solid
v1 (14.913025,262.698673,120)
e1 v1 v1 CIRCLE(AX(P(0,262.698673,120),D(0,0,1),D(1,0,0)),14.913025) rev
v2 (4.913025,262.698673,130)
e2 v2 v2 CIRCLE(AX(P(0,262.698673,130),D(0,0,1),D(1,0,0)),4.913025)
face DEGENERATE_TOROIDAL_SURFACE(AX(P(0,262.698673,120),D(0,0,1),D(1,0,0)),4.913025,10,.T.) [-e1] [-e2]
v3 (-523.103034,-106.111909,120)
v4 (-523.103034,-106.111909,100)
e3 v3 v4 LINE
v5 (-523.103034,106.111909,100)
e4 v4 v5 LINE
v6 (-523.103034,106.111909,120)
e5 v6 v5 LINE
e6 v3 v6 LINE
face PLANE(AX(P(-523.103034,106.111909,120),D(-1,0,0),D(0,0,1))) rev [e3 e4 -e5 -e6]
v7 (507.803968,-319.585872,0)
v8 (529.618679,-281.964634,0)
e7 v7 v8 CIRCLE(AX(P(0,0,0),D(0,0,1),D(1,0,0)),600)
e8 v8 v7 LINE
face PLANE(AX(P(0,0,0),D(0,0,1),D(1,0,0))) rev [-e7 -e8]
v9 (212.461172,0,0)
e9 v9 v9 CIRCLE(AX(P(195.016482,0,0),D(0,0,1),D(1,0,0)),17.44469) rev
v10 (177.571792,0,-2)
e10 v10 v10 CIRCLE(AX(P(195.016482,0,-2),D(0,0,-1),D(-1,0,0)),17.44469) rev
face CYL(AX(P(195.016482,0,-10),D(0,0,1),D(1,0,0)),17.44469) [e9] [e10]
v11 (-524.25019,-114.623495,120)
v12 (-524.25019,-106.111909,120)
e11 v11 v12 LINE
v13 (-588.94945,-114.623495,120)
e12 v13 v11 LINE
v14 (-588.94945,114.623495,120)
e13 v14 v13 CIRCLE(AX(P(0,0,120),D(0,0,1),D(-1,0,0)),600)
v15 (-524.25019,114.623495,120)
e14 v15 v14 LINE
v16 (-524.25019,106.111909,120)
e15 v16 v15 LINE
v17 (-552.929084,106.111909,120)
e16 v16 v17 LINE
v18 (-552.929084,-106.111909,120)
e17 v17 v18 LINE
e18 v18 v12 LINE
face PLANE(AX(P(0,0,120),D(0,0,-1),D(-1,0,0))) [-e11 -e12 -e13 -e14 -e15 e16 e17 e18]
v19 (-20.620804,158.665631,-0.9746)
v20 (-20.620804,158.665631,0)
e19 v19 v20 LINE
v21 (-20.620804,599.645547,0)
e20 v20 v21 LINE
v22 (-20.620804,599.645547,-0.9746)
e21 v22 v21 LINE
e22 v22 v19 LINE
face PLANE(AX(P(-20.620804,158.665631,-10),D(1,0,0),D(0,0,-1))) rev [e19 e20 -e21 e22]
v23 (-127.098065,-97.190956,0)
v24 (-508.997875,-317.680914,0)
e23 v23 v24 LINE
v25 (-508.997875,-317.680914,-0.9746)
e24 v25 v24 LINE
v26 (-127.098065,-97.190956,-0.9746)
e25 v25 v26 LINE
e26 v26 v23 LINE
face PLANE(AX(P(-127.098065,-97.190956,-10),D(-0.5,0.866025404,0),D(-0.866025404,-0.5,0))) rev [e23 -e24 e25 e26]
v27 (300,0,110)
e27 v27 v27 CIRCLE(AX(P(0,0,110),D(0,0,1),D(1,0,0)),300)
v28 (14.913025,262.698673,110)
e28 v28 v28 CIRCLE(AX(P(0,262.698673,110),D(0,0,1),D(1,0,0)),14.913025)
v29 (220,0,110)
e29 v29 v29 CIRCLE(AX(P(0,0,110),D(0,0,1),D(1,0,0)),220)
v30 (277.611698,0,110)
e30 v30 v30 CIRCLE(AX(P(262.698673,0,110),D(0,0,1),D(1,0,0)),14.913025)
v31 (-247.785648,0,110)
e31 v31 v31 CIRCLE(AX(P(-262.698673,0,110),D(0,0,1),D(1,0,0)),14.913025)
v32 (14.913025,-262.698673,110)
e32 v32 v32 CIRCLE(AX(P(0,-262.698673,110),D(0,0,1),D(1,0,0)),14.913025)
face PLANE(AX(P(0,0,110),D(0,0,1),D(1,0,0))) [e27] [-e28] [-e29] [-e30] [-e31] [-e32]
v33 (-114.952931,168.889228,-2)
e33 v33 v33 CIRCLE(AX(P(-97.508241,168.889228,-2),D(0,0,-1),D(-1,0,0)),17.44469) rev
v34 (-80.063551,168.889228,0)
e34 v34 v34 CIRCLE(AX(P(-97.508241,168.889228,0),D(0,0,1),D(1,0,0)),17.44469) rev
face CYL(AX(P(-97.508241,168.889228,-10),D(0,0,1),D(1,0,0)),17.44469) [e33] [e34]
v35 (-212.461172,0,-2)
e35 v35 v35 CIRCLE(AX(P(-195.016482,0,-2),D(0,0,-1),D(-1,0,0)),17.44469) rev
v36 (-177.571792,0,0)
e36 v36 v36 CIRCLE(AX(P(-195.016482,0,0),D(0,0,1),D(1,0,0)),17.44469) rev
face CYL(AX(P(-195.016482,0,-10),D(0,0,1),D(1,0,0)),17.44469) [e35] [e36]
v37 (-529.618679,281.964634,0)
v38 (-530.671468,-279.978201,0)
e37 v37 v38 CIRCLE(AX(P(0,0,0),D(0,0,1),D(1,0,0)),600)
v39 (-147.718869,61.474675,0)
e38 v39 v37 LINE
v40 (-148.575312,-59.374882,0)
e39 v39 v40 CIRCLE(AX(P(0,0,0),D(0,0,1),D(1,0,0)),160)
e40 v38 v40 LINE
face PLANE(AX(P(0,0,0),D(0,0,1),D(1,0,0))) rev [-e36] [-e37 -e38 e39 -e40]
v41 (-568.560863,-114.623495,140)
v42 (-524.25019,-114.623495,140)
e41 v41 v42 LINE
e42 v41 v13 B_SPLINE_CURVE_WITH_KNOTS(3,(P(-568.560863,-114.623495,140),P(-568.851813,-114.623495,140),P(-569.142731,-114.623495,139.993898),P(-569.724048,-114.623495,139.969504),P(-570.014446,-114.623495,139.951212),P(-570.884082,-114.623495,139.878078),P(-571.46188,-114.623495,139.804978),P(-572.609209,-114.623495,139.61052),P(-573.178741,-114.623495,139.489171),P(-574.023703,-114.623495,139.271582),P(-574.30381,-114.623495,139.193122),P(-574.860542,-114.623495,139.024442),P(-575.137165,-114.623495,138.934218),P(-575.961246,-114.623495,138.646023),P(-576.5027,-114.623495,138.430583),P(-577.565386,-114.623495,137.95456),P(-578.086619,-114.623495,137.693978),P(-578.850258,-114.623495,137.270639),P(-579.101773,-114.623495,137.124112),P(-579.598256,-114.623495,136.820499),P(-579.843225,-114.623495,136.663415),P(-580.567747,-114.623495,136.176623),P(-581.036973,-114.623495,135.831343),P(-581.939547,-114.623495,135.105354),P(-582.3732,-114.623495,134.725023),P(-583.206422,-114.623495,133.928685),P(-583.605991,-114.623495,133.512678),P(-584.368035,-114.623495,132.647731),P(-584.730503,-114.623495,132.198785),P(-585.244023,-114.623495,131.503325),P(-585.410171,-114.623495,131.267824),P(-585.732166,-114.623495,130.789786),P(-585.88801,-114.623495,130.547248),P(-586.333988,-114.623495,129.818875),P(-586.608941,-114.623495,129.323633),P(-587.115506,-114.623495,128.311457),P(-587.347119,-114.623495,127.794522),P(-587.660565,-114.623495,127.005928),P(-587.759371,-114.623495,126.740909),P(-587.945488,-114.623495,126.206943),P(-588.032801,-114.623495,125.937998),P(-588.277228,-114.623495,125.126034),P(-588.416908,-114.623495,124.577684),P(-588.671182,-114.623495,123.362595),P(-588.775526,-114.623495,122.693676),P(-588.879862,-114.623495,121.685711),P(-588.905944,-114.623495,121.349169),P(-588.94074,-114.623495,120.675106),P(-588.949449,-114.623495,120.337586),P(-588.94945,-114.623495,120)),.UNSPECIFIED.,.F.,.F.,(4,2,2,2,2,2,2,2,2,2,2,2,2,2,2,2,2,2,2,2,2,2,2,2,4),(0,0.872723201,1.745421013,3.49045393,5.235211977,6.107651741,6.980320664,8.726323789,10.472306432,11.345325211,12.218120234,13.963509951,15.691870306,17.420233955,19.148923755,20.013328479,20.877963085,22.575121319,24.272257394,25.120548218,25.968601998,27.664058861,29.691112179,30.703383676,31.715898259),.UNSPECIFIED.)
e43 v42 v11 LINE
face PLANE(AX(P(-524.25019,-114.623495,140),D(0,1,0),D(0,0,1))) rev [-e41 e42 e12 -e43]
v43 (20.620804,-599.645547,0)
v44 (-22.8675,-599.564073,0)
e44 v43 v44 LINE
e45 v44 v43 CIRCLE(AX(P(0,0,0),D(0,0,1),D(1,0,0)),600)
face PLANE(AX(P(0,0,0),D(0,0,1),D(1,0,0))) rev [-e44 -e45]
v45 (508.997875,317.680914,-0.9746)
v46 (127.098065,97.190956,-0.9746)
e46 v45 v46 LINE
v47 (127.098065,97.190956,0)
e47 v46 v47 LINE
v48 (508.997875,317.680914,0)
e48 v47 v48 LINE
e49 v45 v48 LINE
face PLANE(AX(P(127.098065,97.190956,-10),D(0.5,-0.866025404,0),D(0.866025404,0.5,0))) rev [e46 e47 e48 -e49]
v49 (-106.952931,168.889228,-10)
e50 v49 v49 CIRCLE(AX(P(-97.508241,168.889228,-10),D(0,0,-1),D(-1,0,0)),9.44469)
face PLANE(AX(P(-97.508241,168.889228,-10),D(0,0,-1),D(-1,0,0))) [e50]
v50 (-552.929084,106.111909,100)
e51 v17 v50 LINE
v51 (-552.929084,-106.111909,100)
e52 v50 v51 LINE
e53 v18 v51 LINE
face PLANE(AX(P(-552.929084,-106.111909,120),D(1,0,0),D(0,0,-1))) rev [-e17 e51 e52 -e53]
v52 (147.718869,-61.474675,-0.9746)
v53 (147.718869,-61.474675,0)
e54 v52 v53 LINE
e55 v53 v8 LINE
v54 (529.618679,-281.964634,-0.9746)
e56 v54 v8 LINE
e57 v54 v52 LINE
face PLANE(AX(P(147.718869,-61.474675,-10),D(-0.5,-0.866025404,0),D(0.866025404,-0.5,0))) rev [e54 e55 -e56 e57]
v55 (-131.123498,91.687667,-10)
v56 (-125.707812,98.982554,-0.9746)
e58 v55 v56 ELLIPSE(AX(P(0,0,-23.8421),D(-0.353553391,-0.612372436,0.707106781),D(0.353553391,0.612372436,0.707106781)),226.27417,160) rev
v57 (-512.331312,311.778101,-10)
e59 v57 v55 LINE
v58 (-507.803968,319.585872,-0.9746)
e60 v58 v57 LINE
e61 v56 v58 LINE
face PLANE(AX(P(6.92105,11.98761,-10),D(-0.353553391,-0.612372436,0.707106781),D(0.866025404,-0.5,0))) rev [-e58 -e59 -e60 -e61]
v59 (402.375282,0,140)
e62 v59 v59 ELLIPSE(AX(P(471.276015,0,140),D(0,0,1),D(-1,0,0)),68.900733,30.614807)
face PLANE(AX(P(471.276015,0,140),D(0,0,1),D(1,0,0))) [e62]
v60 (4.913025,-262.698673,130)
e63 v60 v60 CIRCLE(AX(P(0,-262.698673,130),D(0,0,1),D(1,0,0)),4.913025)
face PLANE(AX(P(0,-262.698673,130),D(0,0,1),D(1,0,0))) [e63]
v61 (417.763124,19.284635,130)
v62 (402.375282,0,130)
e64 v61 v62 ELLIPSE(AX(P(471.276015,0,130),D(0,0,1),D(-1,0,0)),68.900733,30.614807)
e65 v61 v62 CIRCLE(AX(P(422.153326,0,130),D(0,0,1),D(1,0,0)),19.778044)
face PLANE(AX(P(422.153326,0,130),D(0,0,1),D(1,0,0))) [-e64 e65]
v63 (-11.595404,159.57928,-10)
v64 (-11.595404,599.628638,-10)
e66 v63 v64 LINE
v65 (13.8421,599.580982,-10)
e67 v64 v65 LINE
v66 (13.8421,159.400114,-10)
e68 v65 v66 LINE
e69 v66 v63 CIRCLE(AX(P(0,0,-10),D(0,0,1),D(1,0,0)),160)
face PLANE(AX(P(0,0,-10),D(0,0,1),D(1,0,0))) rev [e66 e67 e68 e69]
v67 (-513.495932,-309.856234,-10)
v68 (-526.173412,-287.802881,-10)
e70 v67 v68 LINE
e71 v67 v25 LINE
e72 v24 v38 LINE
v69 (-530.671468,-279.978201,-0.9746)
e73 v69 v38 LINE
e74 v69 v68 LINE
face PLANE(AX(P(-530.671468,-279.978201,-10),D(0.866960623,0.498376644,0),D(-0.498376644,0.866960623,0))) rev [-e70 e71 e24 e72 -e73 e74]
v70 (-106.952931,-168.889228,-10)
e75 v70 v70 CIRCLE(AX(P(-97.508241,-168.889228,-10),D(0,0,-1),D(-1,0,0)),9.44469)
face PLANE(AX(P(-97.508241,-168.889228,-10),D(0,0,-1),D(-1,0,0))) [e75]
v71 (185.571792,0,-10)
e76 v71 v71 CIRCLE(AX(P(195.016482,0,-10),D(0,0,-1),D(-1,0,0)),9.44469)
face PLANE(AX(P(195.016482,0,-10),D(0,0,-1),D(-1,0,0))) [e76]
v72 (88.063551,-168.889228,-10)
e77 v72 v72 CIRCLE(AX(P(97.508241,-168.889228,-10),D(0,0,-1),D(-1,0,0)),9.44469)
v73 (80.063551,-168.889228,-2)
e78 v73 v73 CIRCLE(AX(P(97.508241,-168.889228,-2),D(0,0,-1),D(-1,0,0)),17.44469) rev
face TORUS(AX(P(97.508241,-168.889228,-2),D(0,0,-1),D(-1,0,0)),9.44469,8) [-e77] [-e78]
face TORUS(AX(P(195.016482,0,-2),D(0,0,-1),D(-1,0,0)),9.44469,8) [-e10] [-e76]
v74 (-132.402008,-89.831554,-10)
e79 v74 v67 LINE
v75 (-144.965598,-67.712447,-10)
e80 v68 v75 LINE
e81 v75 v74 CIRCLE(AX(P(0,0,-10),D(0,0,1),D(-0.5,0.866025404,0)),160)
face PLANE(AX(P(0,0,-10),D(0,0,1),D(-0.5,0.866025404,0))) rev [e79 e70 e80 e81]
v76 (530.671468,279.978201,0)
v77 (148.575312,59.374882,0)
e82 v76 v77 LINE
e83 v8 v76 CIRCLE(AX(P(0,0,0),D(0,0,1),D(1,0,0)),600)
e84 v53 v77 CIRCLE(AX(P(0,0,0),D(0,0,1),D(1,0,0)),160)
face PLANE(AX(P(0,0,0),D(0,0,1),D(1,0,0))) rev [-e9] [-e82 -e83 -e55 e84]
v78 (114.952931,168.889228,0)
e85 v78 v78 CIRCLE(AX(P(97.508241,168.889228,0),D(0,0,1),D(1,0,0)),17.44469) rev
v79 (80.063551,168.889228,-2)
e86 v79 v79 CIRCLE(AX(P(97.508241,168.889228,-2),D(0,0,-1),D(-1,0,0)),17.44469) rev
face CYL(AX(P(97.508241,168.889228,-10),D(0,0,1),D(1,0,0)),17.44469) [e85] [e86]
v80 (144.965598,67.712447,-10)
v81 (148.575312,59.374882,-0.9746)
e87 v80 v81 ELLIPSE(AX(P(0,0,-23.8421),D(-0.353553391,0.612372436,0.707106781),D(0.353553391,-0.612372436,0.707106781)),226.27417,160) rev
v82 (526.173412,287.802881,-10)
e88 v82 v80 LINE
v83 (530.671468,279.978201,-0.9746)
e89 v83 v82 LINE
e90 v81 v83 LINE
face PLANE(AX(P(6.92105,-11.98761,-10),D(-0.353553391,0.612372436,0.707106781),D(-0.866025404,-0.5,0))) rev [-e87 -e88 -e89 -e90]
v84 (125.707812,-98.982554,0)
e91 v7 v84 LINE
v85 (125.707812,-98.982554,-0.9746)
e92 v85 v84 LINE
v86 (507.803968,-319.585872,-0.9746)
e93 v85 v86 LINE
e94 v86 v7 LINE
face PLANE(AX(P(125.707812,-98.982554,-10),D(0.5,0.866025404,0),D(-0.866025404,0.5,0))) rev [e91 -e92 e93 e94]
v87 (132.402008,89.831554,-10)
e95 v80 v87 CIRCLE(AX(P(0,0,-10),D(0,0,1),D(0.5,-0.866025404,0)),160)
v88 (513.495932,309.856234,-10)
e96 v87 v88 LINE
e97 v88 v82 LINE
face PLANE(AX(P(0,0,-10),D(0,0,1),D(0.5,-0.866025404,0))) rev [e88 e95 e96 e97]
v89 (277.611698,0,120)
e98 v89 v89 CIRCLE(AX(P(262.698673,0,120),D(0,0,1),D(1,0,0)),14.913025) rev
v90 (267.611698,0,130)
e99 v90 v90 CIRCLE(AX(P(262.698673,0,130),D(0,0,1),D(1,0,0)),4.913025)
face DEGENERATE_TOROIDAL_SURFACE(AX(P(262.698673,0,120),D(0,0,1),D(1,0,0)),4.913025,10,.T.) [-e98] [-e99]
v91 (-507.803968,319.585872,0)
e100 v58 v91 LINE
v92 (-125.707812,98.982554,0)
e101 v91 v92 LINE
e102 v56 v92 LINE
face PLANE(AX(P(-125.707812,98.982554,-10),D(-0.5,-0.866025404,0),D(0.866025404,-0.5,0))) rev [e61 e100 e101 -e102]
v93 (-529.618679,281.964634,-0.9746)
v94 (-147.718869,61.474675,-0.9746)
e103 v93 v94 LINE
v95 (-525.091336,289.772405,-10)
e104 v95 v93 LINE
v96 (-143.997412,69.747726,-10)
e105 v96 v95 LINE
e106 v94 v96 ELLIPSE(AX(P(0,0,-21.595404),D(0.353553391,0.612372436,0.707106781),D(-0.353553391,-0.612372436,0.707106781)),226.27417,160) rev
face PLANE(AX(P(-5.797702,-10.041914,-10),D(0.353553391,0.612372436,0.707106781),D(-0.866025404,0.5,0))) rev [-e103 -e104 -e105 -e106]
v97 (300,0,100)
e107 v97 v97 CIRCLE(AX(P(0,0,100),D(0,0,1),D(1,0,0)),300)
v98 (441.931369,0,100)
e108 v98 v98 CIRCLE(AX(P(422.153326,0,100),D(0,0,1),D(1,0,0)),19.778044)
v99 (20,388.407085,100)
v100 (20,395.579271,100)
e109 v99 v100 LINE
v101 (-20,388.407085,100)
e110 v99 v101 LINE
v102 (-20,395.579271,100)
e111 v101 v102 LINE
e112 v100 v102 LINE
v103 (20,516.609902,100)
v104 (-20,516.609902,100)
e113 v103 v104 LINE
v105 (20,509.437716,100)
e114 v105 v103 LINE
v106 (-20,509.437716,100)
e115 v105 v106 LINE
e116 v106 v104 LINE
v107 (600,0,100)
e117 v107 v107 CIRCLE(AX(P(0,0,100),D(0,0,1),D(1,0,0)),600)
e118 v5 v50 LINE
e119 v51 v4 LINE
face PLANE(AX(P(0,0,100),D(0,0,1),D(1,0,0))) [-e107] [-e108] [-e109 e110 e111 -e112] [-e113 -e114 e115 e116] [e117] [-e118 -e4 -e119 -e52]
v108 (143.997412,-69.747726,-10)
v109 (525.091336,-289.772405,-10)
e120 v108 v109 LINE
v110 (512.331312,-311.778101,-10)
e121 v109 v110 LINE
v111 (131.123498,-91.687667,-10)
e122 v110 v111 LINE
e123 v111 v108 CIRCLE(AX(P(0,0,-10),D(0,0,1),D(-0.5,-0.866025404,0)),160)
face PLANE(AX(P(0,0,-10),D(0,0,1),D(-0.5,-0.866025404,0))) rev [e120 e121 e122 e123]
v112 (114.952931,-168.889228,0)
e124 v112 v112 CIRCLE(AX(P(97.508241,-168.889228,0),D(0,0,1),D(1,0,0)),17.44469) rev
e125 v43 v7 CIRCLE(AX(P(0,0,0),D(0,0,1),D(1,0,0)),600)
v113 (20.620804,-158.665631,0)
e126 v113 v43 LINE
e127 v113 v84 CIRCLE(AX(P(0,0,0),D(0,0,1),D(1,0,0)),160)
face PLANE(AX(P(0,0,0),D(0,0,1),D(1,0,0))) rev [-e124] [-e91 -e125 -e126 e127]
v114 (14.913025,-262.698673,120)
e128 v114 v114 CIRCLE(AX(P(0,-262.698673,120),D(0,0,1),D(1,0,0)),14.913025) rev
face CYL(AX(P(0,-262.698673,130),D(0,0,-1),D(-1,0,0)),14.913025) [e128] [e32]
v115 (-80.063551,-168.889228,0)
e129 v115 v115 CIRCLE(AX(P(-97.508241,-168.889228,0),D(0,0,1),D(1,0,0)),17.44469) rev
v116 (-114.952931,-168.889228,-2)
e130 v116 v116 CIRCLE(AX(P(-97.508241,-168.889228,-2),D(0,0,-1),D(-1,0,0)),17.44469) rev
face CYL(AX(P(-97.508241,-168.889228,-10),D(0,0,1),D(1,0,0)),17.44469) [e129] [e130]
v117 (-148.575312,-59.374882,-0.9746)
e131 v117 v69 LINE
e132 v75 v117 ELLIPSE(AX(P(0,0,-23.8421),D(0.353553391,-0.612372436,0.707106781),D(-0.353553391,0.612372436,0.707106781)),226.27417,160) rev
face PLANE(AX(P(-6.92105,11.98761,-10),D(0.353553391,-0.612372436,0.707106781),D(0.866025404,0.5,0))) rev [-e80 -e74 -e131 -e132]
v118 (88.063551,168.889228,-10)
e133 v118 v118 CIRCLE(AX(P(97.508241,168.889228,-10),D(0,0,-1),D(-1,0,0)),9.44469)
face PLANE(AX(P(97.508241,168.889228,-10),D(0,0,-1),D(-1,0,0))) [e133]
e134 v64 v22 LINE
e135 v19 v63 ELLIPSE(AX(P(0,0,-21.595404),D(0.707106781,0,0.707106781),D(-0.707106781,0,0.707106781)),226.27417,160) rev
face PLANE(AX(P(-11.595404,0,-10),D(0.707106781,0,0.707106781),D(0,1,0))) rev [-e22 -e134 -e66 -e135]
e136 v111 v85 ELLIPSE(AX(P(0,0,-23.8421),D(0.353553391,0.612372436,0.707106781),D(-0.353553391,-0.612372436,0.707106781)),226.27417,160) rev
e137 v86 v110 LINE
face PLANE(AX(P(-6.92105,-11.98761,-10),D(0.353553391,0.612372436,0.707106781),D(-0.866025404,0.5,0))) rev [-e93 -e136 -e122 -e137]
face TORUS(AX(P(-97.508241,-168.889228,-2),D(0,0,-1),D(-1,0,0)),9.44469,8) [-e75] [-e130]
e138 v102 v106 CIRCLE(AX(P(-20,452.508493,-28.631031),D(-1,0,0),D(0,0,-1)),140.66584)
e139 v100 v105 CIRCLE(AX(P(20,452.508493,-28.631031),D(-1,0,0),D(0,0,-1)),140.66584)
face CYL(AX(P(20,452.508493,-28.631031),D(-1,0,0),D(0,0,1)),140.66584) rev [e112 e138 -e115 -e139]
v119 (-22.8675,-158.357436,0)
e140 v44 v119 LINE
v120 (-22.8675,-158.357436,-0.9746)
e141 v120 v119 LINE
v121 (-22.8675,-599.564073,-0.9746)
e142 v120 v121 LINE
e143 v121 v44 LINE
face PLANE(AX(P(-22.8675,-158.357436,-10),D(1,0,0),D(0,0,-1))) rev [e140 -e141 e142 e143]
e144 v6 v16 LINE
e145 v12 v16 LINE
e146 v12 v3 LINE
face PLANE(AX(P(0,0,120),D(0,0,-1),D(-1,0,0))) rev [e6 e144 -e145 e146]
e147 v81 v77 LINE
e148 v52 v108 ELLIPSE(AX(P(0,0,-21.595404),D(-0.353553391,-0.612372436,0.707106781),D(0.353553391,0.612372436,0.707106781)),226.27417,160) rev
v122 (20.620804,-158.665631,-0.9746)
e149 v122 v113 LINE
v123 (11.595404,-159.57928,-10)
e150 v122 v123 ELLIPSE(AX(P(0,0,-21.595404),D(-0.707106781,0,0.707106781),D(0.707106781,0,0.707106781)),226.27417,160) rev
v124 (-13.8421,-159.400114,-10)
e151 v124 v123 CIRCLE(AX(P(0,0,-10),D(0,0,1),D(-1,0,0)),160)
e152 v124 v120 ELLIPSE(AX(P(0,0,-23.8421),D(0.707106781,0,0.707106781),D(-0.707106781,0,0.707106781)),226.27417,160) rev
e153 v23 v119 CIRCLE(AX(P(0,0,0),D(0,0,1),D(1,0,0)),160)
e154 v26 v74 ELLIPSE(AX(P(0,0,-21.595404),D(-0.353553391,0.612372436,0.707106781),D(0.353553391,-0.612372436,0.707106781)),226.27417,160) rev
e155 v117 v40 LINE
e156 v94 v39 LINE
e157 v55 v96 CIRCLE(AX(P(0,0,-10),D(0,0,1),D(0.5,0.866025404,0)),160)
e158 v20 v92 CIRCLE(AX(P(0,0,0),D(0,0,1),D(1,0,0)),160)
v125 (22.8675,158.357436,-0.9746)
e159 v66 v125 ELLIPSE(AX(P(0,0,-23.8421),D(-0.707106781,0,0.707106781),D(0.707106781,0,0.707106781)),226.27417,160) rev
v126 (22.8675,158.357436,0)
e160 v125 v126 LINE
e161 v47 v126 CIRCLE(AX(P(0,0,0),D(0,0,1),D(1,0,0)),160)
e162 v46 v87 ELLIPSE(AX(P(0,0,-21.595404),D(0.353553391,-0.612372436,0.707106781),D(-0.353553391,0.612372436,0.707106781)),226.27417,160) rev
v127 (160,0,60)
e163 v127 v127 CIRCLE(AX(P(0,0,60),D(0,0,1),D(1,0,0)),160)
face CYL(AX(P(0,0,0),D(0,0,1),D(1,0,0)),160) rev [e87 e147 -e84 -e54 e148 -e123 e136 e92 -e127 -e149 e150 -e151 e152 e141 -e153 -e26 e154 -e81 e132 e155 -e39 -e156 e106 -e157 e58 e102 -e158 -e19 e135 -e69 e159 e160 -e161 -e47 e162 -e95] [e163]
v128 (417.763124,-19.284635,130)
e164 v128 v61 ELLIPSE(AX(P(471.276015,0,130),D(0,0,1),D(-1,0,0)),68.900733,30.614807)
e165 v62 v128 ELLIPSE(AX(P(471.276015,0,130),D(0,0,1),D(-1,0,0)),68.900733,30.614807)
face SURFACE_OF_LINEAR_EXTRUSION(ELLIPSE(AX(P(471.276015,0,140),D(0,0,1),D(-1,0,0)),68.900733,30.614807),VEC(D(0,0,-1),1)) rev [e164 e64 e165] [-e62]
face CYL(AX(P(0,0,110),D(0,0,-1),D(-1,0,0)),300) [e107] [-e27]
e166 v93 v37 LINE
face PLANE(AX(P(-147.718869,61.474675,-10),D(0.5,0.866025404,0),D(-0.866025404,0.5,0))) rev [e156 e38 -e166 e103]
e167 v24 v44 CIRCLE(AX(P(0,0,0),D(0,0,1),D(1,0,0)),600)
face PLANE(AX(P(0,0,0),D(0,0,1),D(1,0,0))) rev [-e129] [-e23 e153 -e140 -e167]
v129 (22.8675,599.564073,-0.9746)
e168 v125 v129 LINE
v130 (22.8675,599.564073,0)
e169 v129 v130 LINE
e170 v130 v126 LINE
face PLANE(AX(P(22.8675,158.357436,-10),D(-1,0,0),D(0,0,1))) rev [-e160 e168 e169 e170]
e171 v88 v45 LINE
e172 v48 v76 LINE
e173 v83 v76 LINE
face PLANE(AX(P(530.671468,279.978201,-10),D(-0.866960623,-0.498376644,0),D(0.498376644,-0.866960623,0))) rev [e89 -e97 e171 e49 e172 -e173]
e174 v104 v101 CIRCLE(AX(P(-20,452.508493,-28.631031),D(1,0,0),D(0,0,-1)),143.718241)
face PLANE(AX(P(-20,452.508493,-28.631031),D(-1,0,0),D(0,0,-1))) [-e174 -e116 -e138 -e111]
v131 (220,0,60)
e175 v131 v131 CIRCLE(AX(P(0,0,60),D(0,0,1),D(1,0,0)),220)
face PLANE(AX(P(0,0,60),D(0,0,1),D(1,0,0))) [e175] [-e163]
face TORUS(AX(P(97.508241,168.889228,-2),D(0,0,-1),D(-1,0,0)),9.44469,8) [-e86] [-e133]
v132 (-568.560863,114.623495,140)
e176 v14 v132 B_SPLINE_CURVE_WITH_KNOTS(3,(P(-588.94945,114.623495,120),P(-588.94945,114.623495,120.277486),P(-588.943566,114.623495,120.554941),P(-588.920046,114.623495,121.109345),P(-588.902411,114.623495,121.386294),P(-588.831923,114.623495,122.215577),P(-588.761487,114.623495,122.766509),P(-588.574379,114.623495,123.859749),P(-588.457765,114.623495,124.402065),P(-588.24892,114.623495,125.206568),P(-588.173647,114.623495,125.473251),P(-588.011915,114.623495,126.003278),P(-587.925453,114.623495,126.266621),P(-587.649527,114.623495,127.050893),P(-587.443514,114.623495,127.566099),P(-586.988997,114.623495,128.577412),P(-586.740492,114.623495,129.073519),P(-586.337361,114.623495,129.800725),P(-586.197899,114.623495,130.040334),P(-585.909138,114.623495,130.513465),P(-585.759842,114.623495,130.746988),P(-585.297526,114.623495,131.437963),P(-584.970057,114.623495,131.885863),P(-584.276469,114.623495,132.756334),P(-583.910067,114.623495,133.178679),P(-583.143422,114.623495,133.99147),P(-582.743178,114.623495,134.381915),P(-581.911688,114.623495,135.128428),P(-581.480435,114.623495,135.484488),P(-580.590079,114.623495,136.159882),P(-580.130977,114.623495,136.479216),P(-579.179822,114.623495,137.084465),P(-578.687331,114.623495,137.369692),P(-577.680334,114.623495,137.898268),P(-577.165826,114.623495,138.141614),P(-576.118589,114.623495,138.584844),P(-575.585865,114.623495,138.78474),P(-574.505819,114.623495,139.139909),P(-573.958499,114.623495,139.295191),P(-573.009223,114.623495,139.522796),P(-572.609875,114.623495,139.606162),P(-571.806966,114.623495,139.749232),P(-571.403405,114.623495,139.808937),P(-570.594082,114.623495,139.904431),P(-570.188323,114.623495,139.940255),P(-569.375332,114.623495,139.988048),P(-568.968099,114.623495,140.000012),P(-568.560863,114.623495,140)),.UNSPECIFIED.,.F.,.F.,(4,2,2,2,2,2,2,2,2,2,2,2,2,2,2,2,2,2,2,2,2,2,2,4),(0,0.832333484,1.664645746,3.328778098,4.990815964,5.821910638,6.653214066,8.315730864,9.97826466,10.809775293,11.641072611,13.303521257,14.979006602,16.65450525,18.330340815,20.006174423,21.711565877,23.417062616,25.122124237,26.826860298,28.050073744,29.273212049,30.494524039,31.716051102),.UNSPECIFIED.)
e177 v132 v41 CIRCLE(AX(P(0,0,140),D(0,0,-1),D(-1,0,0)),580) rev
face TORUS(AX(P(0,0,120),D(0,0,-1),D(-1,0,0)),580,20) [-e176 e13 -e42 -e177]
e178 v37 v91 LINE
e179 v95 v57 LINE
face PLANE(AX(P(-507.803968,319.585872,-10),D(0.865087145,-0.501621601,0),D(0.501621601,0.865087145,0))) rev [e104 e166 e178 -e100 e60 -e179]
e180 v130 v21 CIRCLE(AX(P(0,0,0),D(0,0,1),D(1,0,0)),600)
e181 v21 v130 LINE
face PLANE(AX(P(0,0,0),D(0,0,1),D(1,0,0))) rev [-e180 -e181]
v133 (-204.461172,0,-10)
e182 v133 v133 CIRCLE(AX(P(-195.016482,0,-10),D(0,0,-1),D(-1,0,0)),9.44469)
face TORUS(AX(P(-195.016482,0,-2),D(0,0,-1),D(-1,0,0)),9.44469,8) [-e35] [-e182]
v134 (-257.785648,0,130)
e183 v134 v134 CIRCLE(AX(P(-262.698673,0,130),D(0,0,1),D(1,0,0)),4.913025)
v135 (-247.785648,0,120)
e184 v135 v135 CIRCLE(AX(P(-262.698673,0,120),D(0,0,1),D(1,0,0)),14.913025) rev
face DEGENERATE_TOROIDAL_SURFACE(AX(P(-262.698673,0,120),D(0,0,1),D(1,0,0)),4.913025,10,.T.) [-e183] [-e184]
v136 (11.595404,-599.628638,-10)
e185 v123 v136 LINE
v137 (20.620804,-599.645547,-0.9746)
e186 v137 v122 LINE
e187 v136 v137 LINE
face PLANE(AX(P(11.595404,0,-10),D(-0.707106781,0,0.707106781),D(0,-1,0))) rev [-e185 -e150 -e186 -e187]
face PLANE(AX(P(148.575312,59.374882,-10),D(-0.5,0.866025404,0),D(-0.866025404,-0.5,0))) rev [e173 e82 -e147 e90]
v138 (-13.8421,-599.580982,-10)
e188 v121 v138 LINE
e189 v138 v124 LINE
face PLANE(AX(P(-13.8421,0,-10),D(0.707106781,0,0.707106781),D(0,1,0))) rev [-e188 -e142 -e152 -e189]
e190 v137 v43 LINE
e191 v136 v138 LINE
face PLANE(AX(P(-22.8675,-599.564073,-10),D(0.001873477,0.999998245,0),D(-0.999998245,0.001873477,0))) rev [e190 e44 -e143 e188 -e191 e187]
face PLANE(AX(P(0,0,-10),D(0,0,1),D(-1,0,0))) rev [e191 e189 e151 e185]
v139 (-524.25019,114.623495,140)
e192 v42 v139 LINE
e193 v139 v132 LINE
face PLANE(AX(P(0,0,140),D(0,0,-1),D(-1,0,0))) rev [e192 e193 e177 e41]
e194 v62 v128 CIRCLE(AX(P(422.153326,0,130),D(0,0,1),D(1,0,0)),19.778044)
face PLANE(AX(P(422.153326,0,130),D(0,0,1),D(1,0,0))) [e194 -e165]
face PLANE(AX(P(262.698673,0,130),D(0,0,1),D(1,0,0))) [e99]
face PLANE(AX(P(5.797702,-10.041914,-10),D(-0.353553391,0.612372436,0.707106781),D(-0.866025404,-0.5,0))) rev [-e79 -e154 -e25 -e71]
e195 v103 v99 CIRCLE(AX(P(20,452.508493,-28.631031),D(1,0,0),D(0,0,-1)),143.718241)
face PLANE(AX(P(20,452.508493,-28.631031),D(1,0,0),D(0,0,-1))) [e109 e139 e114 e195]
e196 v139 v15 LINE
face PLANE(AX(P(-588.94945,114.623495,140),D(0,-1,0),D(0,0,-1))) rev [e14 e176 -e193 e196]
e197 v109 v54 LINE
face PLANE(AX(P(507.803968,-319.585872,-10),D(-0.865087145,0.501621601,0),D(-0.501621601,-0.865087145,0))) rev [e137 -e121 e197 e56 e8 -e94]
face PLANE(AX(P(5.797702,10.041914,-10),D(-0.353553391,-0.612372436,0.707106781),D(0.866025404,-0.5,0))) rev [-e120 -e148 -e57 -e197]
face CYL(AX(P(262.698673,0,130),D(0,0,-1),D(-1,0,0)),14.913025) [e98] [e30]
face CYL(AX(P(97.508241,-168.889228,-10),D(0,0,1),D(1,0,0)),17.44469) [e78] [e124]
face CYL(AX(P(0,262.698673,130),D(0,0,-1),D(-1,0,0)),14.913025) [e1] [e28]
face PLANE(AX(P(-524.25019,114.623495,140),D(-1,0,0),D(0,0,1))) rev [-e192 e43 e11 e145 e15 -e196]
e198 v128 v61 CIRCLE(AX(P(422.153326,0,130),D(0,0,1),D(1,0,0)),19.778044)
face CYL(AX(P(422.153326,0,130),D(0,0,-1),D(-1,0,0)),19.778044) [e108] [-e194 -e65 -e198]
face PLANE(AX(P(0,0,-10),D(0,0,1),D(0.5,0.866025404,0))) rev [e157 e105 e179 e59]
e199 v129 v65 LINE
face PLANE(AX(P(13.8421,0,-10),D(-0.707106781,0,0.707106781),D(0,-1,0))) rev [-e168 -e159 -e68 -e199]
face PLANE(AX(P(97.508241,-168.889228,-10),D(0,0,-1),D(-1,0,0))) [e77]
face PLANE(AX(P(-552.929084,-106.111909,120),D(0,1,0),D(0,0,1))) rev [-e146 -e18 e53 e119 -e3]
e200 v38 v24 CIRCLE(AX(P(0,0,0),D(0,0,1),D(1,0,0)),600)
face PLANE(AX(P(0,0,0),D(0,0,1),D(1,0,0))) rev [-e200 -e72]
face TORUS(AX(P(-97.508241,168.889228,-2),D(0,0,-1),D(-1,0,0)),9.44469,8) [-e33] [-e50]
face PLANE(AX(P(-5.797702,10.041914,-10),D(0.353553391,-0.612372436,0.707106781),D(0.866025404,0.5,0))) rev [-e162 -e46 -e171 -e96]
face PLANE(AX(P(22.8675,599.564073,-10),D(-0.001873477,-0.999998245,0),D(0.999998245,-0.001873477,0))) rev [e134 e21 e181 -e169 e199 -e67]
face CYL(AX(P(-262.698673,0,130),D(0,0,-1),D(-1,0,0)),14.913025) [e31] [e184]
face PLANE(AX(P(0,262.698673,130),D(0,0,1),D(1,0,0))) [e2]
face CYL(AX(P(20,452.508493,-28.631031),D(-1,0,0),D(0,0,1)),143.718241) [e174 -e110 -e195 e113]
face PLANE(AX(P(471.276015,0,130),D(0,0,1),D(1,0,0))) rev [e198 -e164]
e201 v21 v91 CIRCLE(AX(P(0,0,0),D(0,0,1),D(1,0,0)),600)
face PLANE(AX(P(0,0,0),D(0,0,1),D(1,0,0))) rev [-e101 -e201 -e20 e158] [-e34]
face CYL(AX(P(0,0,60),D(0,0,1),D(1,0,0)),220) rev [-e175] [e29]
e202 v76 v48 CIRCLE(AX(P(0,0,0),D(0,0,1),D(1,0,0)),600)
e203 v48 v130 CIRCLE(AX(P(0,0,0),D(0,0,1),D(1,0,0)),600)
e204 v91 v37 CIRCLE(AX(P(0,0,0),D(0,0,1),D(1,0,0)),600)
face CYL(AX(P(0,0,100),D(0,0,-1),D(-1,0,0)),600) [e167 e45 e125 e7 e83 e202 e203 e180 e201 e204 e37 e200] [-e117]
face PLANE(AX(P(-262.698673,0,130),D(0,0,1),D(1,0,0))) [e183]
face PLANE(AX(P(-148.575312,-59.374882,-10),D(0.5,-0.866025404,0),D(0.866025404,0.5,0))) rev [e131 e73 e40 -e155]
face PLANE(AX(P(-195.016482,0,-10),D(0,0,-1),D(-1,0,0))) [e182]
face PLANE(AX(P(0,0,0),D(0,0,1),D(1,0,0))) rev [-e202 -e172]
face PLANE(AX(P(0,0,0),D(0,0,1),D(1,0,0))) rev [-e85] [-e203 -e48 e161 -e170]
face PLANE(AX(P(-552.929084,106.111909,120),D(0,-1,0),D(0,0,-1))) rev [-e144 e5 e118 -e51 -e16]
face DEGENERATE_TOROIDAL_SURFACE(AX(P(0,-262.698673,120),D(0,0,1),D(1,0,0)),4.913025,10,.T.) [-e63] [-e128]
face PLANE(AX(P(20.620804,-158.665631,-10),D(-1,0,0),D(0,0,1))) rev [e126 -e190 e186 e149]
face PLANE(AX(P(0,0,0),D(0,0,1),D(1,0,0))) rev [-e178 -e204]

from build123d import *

# Parameters (mm, degrees)
SKETCH1_R                    = 600
BOSS_EXTRUDE1_DEPTH          = 100
SKETCH2_R                    = 300
BOSS_EXTRUDE2_DEPTH          = 10
SKETCH3_R                    = 220
CUT_EXTRUDE1_DEPTH           = 50
SKETCH4_R                    = 160
CUT_EXTRUDE2_DEPTH           = 851.646812725
SKETCH6_R                    = 14.913025091
BOSS_EXTRUDE4_DEPTH          = 20
FILLET1_R                    = 10
SKETCH7_W                    = 29.826050183
SKETCH7_H                    = 212.223818606
BOSS_EXTRUDE5_DEPTH          = 20
BOSS_EXTRUDE6_DEPTH          = 20
FILLET2_R                    = 20
SKETCH10_R                   = 19.778043507
BOSS_EXTRUDE7_DEPTH          = 30
SKETCH11_RX                  = 68.900732716
SKETCH11_RY                  = 30.614806754
BOSS_EXTRUDE9_DEPTH          = 10
BOSS_EXTRUDE10_DEPTH         = 20
BOSS_EXTRUDE11_DEPTH         = 10
CHAMFER1_SIZE                = 9.0254
CIRPATTERN1_COUNT            = 6
CHAMFER1_OF_CIRPATTERN1_SIZE = 9.0254
SKETCH14_R                   = 17.44469043
BOSS_EXTRUDE12_DEPTH         = 10
FILLET3_R                    = 8


with BuildPart() as part:
    # Sketch1 → Boss-Extrude1 (new body)
    with BuildSketch(Plane.XY):
        Circle(SKETCH1_R)
    extrude(amount=BOSS_EXTRUDE1_DEPTH)

    # Sketch2 → Boss-Extrude2 (add)
    with BuildSketch(Plane.XY.offset(100)):
        Circle(SKETCH2_R)
    extrude(amount=BOSS_EXTRUDE2_DEPTH)

    # Sketch3 → Cut-Extrude1 (cut)
    with BuildSketch(Plane.XY.offset(110)):
        Circle(SKETCH3_R)
    extrude(amount=-CUT_EXTRUDE1_DEPTH, mode=Mode.SUBTRACT)

    # Sketch4 → Cut-Extrude2 (cut, through all)
    with BuildSketch(Plane.XY.offset(60)):
        Circle(SKETCH4_R)
    extrude(amount=-CUT_EXTRUDE2_DEPTH, mode=Mode.SUBTRACT)

    # Sketch6 → Boss-Extrude4 (add)
    with BuildSketch(Plane.XY.offset(110)):
        with Locations((-262.698672761, 0)):
            Circle(SKETCH6_R)
        with Locations((0, 262.698672761)):
            Circle(SKETCH6_R)
        with Locations((262.698672761, 0)):
            Circle(SKETCH6_R)
        with Locations((0, -262.698672761)):
            Circle(SKETCH6_R)
    extrude(amount=BOSS_EXTRUDE4_DEPTH)

    # Fillet1
    fillet1_edges = [part.edges().sort_by_distance(p)[0] for p in [
        (-277.611697852, 0, 130),
        (-14.913025091, 262.698672761, 130),
        (247.78564767, 0, 130),
        (-14.913025091, -262.698672761, 130),
    ]]
    fillet(fillet1_edges, radius=FILLET1_R)

    # Sketch7 → Boss-Extrude5 (add)
    with BuildSketch(Plane.XY.offset(100)):
        with Locations((-538.016059061, 0)):
            Rectangle(SKETCH7_W, SKETCH7_H)
    extrude(amount=BOSS_EXTRUDE5_DEPTH)

    # Sketch9 → Boss-Extrude6 (add)
    with BuildSketch(Plane.XY.offset(120)):
        with BuildLine():
            Line((-588.949449766, 114.623495062), (-524.250189746, 114.623495062))
            Line((-524.250189746, 114.623495062), (-524.250189746, -114.623495062))
            Line((-524.250189746, -114.623495062), (-588.949449766, -114.623495062))
            ThreePointArc((-588.949449766, -114.623495062), (-600, 0), (-588.949449766, 114.623495062))
        make_face()
    extrude(amount=BOSS_EXTRUDE6_DEPTH)

    # Fillet2
    fillet2_edges = [part.edges().sort_by_distance(p)[0] for p in [
        (-600, 0, 140),
    ]]
    fillet(fillet2_edges, radius=FILLET2_R - 0.0001)  # a hair under: the kernel refuses the full size

    # Sketch10 → Boss-Extrude7 (add)
    with BuildSketch(Plane.XY.offset(100)):
        with Locations((422.153325659, 0)):
            Circle(SKETCH10_R)
    extrude(amount=BOSS_EXTRUDE7_DEPTH)

    # Sketch11 → Boss-Extrude9 (add)
    with BuildSketch(Plane.XY.offset(130)):
        with Locations(Location((471.276014868, 0), (0, 0, 180))):
            Ellipse(SKETCH11_RX, SKETCH11_RY)
    extrude(amount=BOSS_EXTRUDE9_DEPTH)

    # Sketch12 → Boss-Extrude10 (add)
    with BuildSketch(Plane(origin=(0, 0, 0), x_dir=(0, 0, -1), z_dir=(1, 0, 0))):
        with BuildLine():
            Line((-100, 509.437716403), (-100, 516.609901971))
            ThreePointArc((-100, 516.609901971), (-115.08720969, 452.50849346), (-100, 388.407084949))
            Line((-100, 388.407084949), (-100, 395.579270517))
            ThreePointArc((-100, 395.579270517), (-112.034809058, 452.50849346), (-100, 509.437716403))
        make_face()
    boss_extrude10 = extrude(amount=BOSS_EXTRUDE10_DEPTH)

    # Mirror1: Boss-Extrude10 across plane
    add(boss_extrude10.mirror(Plane(origin=(0, 0, 0), x_dir=(0, 0, 1), z_dir=(1, 0, 0))))

    # Sketch13 → Boss-Extrude11 (add)
    with BuildSketch(Plane(origin=(0, 0, 0), x_dir=(-1, 0, 0), z_dir=(0, 0, -1))):
        with BuildLine():
            Line((20.620804021, 158.66563094), (20.620804021, 599.645547337))
            Line((20.620804021, 599.645547337), (-22.867499746, 599.564072852))
            Line((-22.867499746, 599.564072852), (-22.867499746, 158.357435744))
            ThreePointArc((-22.867499746, 158.357435744), (-1.133867933, 159.995982273), (20.620804021, 158.66563094))
        make_face()
    boss_extrude11 = extrude(amount=BOSS_EXTRUDE11_DEPTH)

    # Chamfer1
    chamfer1_edges = [part.edges().sort_by_distance(p)[0] for p in [
        (-20.620804021, 379.155589139, -10),
        (22.867499746, 378.960754298, -10),
    ]]
    chamfer(chamfer1_edges, length=CHAMFER1_SIZE)

    # CirPattern1: Boss-Extrude11 ×6 about axis
    cirpattern1_axis = Axis((0, 0, 0), (0, 0, 1))
    for i in range(1, CIRPATTERN1_COUNT):
        add(boss_extrude11.rotate(cirpattern1_axis, i * 360 / CIRPATTERN1_COUNT))

    # Chamfer1 of CirPattern1
    chamfer1_of_cirpattern1_edges = [part.edges().sort_by_distance(p)[0] for p in [
        (-338.668774191, 171.719654441, -10),
        (-316.755890386, 209.28421285, -10),
        (-318.04797017, -207.435934698, -10),
        (-339.623390133, -169.676541448, -10),
        (20.620804021, -379.155589139, -10),
        (-22.867499746, -378.960754298, -10),
        (338.668774191, -171.719654441, -10),
        (316.755890386, -209.28421285, -10),
        (318.04797017, 207.435934698, -10),
        (339.623390133, 169.676541448, -10),
    ]]
    chamfer(chamfer1_of_cirpattern1_edges, length=CHAMFER1_OF_CIRPATTERN1_SIZE)

    # Sketch14 → Boss-Extrude12 (add)
    with BuildSketch(Plane(origin=(0, 0, 0), x_dir=(-1, 0, 0), z_dir=(0, 0, -1))):
        with Locations(Location((-195.016481962, 0, 0), (0, 0, 180))):
            Circle(SKETCH14_R)
        with Locations(Location((-97.508240981, 168.889227536, 0), (0, 0, 180))):
            Circle(SKETCH14_R)
        with Locations(Location((97.508240981, 168.889227536, 0), (0, 0, 180))):
            Circle(SKETCH14_R)
        with Locations(Location((195.016481962, 0, 0), (0, 0, 180))):
            Circle(SKETCH14_R)
        with Locations(Location((97.508240981, -168.889227536, 0), (0, 0, 180))):
            Circle(SKETCH14_R)
        with Locations(Location((-97.508240981, -168.889227536, 0), (0, 0, 180))):
            Circle(SKETCH14_R)
    extrude(amount=BOSS_EXTRUDE12_DEPTH)

    # Fillet3
    fillet3_edges = [part.edges().sort_by_distance(p)[0] for p in [
        (177.571791532, 0, -10),
        (80.063550551, 168.889227536, -10),
        (-114.952931412, 168.889227536, -10),
        (-212.461172393, 0, -10),
        (-114.952931412, -168.889227536, -10),
        (80.063550551, -168.889227536, -10),
    ]]
    fillet(fillet3_edges, radius=FILLET3_R)


solid = part.part
